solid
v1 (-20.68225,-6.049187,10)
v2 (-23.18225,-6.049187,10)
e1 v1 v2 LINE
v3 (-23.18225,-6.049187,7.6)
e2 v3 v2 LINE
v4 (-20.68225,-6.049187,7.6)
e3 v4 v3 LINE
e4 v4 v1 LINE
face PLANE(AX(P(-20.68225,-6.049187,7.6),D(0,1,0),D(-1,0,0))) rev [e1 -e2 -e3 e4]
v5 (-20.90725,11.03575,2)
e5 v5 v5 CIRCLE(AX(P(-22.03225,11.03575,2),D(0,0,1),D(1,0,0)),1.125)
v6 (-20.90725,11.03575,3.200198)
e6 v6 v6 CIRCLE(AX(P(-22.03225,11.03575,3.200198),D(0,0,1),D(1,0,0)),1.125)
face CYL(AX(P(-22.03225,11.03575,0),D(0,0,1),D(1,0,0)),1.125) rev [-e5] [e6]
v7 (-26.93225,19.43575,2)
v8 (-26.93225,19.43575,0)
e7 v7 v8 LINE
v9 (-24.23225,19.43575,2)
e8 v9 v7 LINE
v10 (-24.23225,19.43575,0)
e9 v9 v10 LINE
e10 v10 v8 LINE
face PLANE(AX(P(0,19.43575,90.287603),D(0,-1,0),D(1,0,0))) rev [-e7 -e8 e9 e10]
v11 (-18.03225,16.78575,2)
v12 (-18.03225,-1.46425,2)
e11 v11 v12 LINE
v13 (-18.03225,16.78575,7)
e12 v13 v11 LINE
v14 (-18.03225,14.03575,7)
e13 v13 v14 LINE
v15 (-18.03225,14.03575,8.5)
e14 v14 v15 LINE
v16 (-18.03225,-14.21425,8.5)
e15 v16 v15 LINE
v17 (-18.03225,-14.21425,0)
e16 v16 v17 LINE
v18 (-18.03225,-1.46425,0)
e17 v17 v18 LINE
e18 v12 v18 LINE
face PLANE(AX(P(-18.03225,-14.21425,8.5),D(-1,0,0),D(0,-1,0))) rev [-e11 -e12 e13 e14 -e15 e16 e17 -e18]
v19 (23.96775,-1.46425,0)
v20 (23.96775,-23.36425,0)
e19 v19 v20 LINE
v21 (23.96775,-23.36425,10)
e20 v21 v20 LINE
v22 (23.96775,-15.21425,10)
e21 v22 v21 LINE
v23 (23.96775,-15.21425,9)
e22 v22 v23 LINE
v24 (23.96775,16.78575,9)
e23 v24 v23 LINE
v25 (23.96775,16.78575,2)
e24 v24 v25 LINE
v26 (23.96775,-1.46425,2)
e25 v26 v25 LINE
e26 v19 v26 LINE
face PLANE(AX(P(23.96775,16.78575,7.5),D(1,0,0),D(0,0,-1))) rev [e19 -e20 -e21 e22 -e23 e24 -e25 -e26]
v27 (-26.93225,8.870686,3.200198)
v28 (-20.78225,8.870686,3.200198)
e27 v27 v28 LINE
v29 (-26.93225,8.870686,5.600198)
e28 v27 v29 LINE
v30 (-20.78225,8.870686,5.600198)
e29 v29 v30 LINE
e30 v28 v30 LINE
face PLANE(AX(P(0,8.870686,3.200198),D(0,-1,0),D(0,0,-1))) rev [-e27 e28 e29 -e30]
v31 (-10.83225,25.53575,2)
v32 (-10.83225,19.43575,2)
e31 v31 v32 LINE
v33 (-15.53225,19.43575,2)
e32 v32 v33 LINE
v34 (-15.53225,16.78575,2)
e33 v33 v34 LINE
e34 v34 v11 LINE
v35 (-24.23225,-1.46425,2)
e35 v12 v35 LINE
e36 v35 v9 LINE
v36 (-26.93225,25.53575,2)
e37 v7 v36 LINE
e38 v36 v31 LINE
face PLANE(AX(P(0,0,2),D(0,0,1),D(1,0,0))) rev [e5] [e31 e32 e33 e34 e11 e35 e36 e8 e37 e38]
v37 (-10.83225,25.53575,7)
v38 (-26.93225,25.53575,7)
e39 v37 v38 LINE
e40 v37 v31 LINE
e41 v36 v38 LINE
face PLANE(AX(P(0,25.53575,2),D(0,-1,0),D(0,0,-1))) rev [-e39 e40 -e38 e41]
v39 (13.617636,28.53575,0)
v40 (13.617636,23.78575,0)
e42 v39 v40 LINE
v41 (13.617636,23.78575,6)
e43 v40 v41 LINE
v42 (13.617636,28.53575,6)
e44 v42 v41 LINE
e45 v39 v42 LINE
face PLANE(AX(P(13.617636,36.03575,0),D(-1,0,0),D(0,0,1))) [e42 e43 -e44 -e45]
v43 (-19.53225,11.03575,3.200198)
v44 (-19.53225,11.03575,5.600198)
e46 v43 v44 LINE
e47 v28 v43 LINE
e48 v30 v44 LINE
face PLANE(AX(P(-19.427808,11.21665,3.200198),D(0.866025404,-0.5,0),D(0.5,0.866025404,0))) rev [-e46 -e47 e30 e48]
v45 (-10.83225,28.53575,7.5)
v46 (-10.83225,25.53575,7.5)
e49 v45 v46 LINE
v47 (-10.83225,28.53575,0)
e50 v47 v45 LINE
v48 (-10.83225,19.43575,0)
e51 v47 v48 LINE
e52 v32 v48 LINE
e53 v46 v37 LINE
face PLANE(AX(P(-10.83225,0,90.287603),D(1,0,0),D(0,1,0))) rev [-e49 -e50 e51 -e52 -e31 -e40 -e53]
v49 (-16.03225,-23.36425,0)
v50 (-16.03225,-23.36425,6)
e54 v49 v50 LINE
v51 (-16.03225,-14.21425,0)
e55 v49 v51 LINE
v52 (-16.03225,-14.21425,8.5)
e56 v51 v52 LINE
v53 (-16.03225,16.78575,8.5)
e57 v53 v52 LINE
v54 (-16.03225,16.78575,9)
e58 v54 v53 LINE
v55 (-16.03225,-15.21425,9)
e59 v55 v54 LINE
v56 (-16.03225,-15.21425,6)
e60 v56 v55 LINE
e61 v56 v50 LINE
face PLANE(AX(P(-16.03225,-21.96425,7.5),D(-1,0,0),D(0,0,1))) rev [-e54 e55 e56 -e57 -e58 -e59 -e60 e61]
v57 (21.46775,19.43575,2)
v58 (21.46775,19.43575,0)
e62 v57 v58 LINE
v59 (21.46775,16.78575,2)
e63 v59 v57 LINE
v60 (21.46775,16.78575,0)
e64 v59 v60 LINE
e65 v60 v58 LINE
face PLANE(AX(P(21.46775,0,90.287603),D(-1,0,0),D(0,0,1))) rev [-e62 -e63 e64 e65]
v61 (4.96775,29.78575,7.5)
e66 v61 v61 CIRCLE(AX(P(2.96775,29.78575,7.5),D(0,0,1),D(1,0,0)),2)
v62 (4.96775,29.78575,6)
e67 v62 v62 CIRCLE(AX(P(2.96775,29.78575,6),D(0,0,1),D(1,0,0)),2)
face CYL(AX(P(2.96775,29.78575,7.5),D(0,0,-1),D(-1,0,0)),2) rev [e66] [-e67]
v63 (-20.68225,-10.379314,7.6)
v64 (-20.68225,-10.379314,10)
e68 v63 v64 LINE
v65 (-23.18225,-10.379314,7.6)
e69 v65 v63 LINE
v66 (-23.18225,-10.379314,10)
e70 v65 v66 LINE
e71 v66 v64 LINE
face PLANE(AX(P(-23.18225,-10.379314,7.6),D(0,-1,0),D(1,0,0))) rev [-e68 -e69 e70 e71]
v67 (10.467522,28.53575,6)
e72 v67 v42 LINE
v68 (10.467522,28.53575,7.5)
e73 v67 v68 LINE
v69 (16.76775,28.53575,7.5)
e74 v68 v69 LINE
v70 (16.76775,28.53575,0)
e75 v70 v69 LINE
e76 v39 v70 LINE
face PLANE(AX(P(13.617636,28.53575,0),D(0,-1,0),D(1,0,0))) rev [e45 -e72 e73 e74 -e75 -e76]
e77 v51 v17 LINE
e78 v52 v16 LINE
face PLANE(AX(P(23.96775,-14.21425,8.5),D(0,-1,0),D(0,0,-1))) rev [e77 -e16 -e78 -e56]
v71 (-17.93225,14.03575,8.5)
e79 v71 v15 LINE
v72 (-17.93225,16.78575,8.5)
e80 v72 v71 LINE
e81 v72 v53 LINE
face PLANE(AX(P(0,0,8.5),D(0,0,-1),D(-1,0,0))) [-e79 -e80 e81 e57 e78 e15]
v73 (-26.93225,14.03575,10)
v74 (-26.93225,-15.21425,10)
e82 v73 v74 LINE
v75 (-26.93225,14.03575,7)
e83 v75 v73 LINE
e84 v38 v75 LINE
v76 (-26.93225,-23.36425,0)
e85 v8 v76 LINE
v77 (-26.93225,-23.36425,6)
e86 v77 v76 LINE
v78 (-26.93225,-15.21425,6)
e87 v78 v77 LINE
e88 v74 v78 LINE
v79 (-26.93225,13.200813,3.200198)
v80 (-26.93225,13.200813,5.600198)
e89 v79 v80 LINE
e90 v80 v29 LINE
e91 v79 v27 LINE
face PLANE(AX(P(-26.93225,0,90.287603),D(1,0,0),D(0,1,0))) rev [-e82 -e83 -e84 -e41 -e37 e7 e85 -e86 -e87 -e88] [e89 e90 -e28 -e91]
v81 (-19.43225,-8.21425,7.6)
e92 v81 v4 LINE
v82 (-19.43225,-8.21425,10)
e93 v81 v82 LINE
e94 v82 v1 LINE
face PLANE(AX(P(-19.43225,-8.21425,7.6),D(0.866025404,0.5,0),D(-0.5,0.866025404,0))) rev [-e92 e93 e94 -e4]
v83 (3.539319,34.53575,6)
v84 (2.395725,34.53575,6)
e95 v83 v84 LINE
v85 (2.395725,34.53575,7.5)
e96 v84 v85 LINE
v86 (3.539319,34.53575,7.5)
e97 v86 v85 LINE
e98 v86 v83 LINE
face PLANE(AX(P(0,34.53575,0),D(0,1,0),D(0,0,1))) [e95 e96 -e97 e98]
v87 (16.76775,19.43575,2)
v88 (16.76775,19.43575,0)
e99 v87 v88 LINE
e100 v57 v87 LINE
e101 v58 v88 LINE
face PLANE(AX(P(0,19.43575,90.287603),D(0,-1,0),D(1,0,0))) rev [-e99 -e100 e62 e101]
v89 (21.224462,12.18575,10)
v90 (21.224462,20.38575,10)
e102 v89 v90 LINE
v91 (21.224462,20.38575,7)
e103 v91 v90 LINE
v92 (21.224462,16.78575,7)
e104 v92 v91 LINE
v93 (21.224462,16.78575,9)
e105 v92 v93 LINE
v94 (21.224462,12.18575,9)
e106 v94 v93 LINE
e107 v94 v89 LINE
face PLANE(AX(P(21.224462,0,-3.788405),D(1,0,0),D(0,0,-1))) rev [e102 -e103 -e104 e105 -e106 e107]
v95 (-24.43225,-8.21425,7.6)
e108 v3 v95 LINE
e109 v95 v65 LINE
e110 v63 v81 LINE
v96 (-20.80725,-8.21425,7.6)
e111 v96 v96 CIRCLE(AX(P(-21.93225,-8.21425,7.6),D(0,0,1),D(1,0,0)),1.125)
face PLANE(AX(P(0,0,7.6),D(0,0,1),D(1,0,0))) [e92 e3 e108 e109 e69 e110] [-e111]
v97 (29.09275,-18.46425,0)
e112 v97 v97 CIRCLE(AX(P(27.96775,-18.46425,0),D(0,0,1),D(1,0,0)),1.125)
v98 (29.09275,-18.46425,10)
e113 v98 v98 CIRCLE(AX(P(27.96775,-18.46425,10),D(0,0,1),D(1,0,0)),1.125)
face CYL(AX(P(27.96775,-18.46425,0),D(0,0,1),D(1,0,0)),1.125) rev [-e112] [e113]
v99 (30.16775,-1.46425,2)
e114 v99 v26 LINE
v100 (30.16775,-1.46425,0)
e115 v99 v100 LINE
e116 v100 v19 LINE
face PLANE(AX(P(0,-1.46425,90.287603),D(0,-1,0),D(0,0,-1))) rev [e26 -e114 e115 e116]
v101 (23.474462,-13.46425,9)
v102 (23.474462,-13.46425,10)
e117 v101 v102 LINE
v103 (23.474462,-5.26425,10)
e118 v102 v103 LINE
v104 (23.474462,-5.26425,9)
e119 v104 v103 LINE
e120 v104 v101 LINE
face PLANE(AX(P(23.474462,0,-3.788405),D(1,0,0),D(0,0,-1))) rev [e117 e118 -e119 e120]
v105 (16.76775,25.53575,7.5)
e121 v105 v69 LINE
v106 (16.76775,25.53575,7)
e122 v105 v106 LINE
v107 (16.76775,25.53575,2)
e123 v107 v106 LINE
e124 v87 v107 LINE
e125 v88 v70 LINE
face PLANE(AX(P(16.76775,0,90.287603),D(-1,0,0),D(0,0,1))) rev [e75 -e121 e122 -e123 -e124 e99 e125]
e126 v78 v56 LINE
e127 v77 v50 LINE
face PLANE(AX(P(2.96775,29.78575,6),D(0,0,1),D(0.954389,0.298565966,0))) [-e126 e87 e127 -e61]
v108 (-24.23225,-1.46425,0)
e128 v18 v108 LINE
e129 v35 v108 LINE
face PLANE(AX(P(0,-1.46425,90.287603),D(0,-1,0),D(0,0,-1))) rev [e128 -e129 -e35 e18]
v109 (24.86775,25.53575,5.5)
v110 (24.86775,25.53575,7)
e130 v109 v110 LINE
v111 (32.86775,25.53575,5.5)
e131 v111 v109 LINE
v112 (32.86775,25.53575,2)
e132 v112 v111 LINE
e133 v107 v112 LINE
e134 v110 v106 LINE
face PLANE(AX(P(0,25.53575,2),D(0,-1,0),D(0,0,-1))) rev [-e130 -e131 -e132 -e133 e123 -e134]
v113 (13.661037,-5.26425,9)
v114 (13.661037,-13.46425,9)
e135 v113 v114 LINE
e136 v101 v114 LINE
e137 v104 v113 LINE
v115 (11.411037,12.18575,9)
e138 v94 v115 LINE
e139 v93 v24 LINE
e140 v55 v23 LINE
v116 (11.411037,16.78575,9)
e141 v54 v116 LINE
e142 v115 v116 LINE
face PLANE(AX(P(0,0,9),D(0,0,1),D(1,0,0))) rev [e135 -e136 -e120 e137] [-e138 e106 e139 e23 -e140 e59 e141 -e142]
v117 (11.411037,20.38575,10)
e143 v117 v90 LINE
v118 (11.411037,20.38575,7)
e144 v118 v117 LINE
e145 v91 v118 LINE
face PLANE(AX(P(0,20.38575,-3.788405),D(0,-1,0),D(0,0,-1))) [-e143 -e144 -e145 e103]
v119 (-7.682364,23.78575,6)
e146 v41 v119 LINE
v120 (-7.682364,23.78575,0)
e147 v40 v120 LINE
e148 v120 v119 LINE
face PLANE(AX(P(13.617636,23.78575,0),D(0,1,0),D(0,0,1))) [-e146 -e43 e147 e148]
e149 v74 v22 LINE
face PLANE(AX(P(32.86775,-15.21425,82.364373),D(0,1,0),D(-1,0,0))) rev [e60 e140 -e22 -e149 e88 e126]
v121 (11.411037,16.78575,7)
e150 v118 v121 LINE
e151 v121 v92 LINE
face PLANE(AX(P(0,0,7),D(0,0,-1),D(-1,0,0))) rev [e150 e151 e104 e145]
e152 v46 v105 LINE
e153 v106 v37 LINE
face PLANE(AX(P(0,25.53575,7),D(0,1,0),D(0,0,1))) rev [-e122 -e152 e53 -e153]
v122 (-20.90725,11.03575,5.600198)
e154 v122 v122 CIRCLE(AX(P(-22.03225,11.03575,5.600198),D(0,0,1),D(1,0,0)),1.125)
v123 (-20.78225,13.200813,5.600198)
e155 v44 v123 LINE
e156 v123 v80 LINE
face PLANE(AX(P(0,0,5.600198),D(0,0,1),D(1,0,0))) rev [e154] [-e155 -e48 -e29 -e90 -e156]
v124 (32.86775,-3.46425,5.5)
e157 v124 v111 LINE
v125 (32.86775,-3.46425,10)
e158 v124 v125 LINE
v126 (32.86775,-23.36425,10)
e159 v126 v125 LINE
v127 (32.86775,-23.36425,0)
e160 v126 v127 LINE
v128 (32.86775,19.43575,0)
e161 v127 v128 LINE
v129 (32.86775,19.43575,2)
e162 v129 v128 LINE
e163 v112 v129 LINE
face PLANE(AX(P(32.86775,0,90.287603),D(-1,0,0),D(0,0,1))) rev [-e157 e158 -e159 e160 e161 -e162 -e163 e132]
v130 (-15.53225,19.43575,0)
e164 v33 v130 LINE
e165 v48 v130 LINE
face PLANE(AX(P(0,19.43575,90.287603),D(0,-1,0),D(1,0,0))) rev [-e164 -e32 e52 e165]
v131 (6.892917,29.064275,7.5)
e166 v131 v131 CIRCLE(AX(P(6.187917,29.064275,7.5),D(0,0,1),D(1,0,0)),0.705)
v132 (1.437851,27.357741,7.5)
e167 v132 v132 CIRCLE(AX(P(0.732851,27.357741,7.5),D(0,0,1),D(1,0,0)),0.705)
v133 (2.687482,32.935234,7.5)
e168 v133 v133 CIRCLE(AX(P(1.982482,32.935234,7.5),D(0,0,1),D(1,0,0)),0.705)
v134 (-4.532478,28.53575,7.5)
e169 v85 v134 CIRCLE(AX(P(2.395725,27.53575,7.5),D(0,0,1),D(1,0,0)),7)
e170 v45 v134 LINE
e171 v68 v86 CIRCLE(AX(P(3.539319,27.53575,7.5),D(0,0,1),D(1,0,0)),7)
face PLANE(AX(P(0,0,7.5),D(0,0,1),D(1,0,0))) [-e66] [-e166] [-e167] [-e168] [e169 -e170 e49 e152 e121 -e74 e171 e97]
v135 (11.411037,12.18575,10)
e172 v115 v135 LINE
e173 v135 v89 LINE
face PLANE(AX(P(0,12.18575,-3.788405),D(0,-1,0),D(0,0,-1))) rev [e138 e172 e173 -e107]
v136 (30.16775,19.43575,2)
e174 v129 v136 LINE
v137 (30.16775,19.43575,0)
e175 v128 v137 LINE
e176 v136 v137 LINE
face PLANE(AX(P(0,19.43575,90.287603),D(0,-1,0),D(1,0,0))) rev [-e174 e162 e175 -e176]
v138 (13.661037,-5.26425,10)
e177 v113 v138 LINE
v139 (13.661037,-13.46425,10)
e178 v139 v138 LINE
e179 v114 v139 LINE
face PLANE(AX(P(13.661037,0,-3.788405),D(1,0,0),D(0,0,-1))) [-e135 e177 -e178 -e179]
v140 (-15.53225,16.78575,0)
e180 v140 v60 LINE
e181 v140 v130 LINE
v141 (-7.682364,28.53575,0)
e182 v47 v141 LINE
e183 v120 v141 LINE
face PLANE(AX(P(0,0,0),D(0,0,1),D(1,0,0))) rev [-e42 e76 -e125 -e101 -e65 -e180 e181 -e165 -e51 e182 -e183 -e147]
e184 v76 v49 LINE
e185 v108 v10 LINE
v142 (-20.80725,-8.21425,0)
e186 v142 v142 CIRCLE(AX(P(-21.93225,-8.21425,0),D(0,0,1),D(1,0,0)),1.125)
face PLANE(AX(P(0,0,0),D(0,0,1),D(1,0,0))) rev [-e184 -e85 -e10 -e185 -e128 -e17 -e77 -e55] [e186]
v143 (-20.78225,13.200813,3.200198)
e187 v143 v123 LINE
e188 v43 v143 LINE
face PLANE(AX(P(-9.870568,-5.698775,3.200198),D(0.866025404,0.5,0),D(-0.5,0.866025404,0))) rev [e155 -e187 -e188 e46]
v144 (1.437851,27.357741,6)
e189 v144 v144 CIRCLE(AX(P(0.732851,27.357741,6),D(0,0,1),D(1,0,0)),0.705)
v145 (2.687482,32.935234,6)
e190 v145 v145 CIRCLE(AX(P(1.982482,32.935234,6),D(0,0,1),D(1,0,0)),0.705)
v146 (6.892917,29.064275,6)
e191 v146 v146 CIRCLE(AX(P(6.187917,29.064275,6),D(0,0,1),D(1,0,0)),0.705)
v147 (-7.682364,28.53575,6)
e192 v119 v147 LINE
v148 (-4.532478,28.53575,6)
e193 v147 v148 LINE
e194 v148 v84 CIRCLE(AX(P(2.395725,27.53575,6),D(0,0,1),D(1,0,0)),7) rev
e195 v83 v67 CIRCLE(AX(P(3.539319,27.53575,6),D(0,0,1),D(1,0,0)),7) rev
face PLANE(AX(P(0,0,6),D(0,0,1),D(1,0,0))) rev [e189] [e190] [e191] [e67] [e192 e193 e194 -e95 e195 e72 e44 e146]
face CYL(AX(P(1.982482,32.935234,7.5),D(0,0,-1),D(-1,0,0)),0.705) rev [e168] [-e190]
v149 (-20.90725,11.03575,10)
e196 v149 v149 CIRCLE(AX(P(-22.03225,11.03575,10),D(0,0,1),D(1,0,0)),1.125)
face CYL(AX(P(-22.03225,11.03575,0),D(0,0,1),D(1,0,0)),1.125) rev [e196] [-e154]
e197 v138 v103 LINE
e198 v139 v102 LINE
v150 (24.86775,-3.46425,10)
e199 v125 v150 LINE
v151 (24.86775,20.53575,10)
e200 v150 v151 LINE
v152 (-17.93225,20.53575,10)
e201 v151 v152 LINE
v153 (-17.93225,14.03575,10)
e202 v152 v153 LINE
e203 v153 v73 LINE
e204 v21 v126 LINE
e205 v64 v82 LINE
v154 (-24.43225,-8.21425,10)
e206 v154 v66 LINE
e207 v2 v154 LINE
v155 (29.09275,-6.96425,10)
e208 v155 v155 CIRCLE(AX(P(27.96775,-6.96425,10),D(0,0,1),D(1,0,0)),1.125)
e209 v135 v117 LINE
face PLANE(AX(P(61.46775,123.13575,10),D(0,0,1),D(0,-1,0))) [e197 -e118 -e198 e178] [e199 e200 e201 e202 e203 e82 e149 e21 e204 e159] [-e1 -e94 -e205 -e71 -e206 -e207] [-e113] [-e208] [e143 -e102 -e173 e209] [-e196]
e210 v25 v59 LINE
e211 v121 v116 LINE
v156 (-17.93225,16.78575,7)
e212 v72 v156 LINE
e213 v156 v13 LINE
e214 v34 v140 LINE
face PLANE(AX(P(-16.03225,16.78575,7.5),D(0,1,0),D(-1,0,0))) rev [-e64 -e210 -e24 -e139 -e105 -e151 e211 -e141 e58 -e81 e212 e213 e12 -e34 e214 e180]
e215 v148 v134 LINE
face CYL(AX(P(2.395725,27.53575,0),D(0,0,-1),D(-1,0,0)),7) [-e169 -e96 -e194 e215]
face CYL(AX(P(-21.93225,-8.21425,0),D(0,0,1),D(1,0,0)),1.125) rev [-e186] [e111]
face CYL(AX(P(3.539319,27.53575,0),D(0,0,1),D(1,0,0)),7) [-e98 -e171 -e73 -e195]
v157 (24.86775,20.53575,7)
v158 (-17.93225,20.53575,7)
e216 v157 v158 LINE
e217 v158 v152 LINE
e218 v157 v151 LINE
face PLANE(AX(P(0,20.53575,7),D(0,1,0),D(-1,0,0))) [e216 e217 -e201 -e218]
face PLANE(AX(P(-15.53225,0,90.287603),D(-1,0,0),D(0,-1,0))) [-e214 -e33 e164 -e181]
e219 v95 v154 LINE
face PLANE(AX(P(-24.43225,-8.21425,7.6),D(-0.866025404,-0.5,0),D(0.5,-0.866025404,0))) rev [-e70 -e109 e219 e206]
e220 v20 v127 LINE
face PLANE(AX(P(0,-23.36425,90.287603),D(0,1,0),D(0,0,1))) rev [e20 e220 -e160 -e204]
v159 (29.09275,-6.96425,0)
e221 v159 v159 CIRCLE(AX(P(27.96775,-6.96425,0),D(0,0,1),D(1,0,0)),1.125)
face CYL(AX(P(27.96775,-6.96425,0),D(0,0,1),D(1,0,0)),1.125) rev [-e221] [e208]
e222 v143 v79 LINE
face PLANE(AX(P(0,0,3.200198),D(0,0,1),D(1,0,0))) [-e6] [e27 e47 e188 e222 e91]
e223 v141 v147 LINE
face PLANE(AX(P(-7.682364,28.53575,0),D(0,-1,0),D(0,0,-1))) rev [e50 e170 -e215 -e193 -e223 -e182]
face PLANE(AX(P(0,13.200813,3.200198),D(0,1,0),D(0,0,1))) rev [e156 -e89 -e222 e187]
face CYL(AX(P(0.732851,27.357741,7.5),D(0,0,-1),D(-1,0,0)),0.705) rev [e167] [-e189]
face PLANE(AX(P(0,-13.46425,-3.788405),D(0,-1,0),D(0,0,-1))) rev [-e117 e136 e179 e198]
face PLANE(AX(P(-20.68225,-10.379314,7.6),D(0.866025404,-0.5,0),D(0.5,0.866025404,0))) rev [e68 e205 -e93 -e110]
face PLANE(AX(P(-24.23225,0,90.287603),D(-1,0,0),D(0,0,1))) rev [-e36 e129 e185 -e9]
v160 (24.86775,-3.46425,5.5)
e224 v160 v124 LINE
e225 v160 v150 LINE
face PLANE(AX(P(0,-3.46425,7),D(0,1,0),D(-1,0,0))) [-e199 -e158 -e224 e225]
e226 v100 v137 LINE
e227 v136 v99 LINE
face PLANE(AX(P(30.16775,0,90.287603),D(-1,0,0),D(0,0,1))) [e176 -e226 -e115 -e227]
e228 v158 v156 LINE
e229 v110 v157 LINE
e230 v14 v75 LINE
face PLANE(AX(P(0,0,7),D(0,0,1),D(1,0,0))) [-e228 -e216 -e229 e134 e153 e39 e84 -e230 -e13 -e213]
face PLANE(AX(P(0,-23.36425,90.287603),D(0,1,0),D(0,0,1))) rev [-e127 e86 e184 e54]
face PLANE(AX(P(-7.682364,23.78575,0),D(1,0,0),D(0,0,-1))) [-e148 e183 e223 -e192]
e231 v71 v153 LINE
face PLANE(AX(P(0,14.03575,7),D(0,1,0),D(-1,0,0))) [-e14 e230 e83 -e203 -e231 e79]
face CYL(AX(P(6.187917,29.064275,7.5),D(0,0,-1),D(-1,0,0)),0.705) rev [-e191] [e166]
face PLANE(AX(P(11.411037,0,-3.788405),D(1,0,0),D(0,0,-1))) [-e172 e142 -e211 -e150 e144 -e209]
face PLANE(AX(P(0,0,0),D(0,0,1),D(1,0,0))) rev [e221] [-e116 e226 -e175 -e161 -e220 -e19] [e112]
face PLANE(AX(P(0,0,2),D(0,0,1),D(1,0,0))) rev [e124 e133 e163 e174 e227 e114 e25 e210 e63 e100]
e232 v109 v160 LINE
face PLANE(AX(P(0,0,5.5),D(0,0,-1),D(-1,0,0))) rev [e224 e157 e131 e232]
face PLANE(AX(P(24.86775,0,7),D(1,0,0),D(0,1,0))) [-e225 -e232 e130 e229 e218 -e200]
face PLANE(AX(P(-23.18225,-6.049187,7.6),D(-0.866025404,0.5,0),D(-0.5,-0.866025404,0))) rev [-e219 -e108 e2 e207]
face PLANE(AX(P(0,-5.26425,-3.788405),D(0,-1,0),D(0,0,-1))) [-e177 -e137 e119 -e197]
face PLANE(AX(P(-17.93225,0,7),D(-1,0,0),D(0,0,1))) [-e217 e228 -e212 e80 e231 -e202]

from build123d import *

# Parameters (mm, degrees)
SKETCH1_R           = 6
BOSS_EXTRUDE1_DEPTH = 6
SKETCH2_W           = 27.6
SKETCH2_H           = 16.6
SKETCH2_R           = 6
SKETCH2_R_2         = 0.705
SKETCH2_R_3         = 2
BOSS_EXTRUDE2_DEPTH = 1.5
BOSS_EXTRUDE3_START = -4
BOSS_EXTRUDE3_DEPTH = 4
SKETCH5_W           = 40
SKETCH5_H           = 38.75
CUT_EXTRUDE1_DEPTH  = 50.346876803
SKETCH6_W           = 59.8
SKETCH6_H           = 40.75
BOSS_EXTRUDE4_DEPTH = 4
SKETCH7_W           = 40
SKETCH7_H           = 38.75
CUT_EXTRUDE2_DEPTH  = 3
SKETCH8_W           = 10.5
SKETCH8_H           = 8.15
CUT_EXTRUDE3_DEPTH  = 3
SKETCH8_3_W         = 9.813424901
SKETCH8_3_H         = 8.2
CUT_EXTRUDE4_DEPTH  = 1
CUT_EXTRUDE5_DEPTH  = 2
SKETCH10_W          = 8.9
SKETCH10_H          = 8.15
BOSS_EXTRUDE5_DEPTH = 4
SKETCH12_W          = 7.5
SKETCH12_H          = 1.5
CUT_EXTRUDE7_DEPTH  = 50.346876803
CUT_EXTRUDE8_DEPTH  = 2.4
CUT_EXTRUDE9_DEPTH  = 2.4
SKETCH16_R          = 1.125
CUT_EXTRUDE10_DEPTH = 50.788193884
SKETCH17_W          = 42
SKETCH17_H          = 31
CUT_EXTRUDE11_DEPTH = 8.5
SKETCH19_W          = 21.3
SKETCH19_H          = 12.25
CUT_EXTRUDE12_DEPTH = 50.141268301
SKETCH20_W          = 3.149886021
SKETCH20_H          = 7.5
SKETCH20_W_2        = 3.150113979
CUT_EXTRUDE13_DEPTH = 50.346876803
FILLET1_R           = 7
SKETCH21_W          = 5
SKETCH21_H          = 1.4
CUT_EXTRUDE14_DEPTH = 50.141268301
SKETCH22_W          = 9.813424901
SKETCH22_H          = 3.6
CUT_EXTRUDE15_DEPTH = 2
SKETCH23_W          = 3.149886021
SKETCH23_H          = 7.5
SKETCH23_W_2        = 3.150113979
CUT_EXTRUDE16_DEPTH = 50.346876803
SKETCH24_W          = 35
SKETCH24_H          = 1.4
CUT_EXTRUDE17_DEPTH = 49.713519689


# Read off the part's stored shape, not the designer's step: Boss-Extrude3
with BuildPart() as part:
    # Sketch1 → Boss-Extrude1 (new body)
    with BuildSketch(Plane.XY):
        Polygon((-10.832250172, 36.035749909), (-10.832250172, 19.435749909), (-15.532250172, 19.435749909), (-15.532250172, -1.464250091), (-24.232250172, -1.464250091), (-24.232250172, 19.435749909), (-26.932250172, 19.435749909), (-26.932250172, -23.364250091), (32.867749828, -23.364250091), (32.867749828, 19.435749909), (30.167749828, 19.435749909), (30.167749828, -1.464250091), (21.467749828, -1.464250091), (21.467749828, 19.435749909), (16.767749828, 19.435749909), (16.767749828, 36.035749909), align=None)
        with Locations((2.967749828, 29.785749909)):
            Circle(SKETCH1_R, mode=Mode.SUBTRACT)
    extrude(amount=BOSS_EXTRUDE1_DEPTH)

    # Sketch2 → Boss-Extrude2 (add)
    # profile 1 of 2: a face of its own
    with BuildSketch(Plane.XY.offset(6)):
        with Locations((2.967749828, 27.735749909)):
            Rectangle(SKETCH2_W, SKETCH2_H)
        with Locations((2.967749828, 29.785749909)):
            Circle(SKETCH2_R, mode=Mode.SUBTRACT)
    # profile 2 of 2: a face of its own
    with BuildSketch(Plane.XY.offset(6)):
        with Locations((2.967749828, 29.785749909)):
            Circle(SKETCH2_R)
        with Locations((0.732850657, 27.357741339)):
            Circle(SKETCH2_R_2, mode=Mode.SUBTRACT)
        with Locations((6.187916827, 29.064275155)):
            Circle(SKETCH2_R_2, mode=Mode.SUBTRACT)
        with Locations((1.982482071, 32.935233827)):
            Circle(SKETCH2_R_2, mode=Mode.SUBTRACT)
        with Locations((2.967749828, 29.785749909)):
            Circle(SKETCH2_R_3, mode=Mode.SUBTRACT)
    extrude(amount=BOSS_EXTRUDE2_DEPTH)

    # Boss-Extrude3 outline → Boss-Extrude3 (add)
    with BuildSketch(Plane.XY.offset(6).offset(BOSS_EXTRUDE3_START)):
        Polygon((32.867749828, 19.435749909), (32.867749828, 25.535749909), (16.767749828, 25.535749909), (16.767749828, 19.435749909), (21.467749828, 19.435749909), (21.467749828, -1.464250091), (30.167749828, -1.464250091), (30.167749828, 19.435749909), align=None)
        Polygon((-26.932250172, 25.535749909), (-26.932250172, 19.435749909), (-24.232250172, 19.435749909), (-24.232250172, -1.464250091), (-15.532250172, -1.464250091), (-15.532250172, 19.435749909), (-10.832250172, 19.435749909), (-10.832250172, 25.535749909), align=None)
    extrude(amount=BOSS_EXTRUDE3_DEPTH)

    # Sketch5 → Cut-Extrude1 (cut, through all)
    with BuildSketch(Plane(origin=(0, 0, 0), x_dir=(-1, 0, 0), z_dir=(0, 0, -1))):
        with Locations((-3.967749828, -2.589250091)):
            Rectangle(SKETCH5_W, SKETCH5_H)
    extrude(amount=-CUT_EXTRUDE1_DEPTH, mode=Mode.SUBTRACT)

    # Sketch6 → Boss-Extrude4 (add)
    with BuildSketch(Plane.XY.offset(6)):
        with Locations((2.967749828, 5.160749909)):
            Rectangle(SKETCH6_W, SKETCH6_H)
    extrude(amount=BOSS_EXTRUDE4_DEPTH)

    # Sketch7 → Cut-Extrude2 (cut)
    with BuildSketch(Plane(origin=(0, 0, 6), x_dir=(-1, 0, 0), z_dir=(0, 0, -1))):
        with Locations((-3.967749828, -2.589250091)):
            Rectangle(SKETCH7_W, SKETCH7_H)
    extrude(amount=-CUT_EXTRUDE2_DEPTH, mode=Mode.SUBTRACT)

    # Sketch8 → Cut-Extrude3 (cut)
    with BuildSketch(Plane.XY.offset(10)):
        Polygon((24.867749828, -3.464250091), (32.867749828, -3.464250091), (32.867749828, 25.535749909), (-26.932250172, 25.535749909), (-26.932250172, 14.035749909), (-17.932250172, 14.035749909), (-17.932250172, 20.535749909), (24.867749828, 20.535749909), align=None)
        with Locations((-21.682250172, -19.289250091)):
            Rectangle(SKETCH8_W, SKETCH8_H)
    extrude(amount=-CUT_EXTRUDE3_DEPTH, mode=Mode.SUBTRACT)

    # Sketch8<3> → Cut-Extrude4 (cut)
    with BuildSketch(Plane.XY.offset(10)):
        with Locations((16.317749828, 16.285749909)):
            Rectangle(SKETCH8_3_W, SKETCH8_3_H)
        with Locations((18.567749828, -9.364250091)):
            Rectangle(SKETCH8_3_W, SKETCH8_3_H)
    extrude(amount=-CUT_EXTRUDE4_DEPTH, mode=Mode.SUBTRACT)

    # Sketch9 → Cut-Extrude5 (cut)
    with BuildSketch(Plane.XY.offset(7.5)):
        Polygon((24.867749828, 20.535749909), (24.867749828, -3.464250091), (32.867749828, -3.464250091), (32.867749828, 25.535749909), (24.867749828, 25.535749909), align=None)
    extrude(amount=-CUT_EXTRUDE5_DEPTH, mode=Mode.SUBTRACT)

    # Sketch10 → Boss-Extrude5 (add)
    with BuildSketch(Plane.XY.offset(6)):
        with Locations((28.417749828, -19.289250091)):
            Rectangle(SKETCH10_W, SKETCH10_H)
    extrude(amount=BOSS_EXTRUDE5_DEPTH)

    # Sketch12 → Cut-Extrude7 (cut, through all)
    with BuildSketch(Plane.XY.offset(7.5)):
        with Locations((-0.78247813, 35.285749909)):
            Rectangle(SKETCH12_W, SKETCH12_H)
        with Locations((6.71752187, 35.285749909)):
            Rectangle(SKETCH12_W, SKETCH12_H)
    extrude(amount=-CUT_EXTRUDE7_DEPTH, mode=Mode.SUBTRACT)

    # Sketch13 → Cut-Extrude8 (cut)
    with BuildSketch(Plane.XY.offset(10)):
        Polygon((-19.432250172, -8.214250091), (-20.682250172, -6.049186582), (-23.182250172, -6.049186582), (-24.432250172, -8.214250091), (-23.182250172, -10.379313601), (-20.682250172, -10.379313601), align=None)
    extrude(amount=-CUT_EXTRUDE8_DEPTH, mode=Mode.SUBTRACT)

    # Sketch15 → Cut-Extrude9 (cut)
    with BuildSketch(Plane(origin=(-203.37180159, 125.682543488, 5.600198), x_dir=(1, 0, 0), z_dir=(0, 0, 1))):
        Polygon((180.089551417, -116.811857089), (182.589551417, -116.811857089), (183.839551417, -114.646793579), (182.589551417, -112.48173007), (180.089551417, -112.48173007), (178.839551417, -114.646793579), align=None)
        Polygon((176.439551417, -112.48173007), (176.439551417, -116.811857089), (180.089551417, -116.811857089), (178.839551417, -114.646793579), (180.089551417, -112.48173007), align=None)
    extrude(amount=-CUT_EXTRUDE9_DEPTH, mode=Mode.SUBTRACT)

    # Sketch16 → Cut-Extrude10 (cut, through all)
    with BuildSketch(Plane.XY.offset(10)):
        with Locations((-21.932250172, -8.214250091)):
            Circle(SKETCH16_R)
        with Locations((-22.032250172, 11.035749909)):
            Circle(SKETCH16_R)
        with Locations((27.967749828, -6.964250091)):
            Circle(SKETCH16_R)
        with Locations((27.967749828, -18.464250091)):
            Circle(SKETCH16_R)
    extrude(amount=-CUT_EXTRUDE10_DEPTH, mode=Mode.SUBTRACT)

    # Sketch17 → Cut-Extrude11 (cut)
    with BuildSketch(Plane(origin=(0, 0, 0), x_dir=(-1, 0, 0), z_dir=(0, 0, -1))):
        with Locations((-2.967749828, 1.285749909)):
            Rectangle(SKETCH17_W, SKETCH17_H)
    extrude(amount=-CUT_EXTRUDE11_DEPTH, mode=Mode.SUBTRACT)

    # Sketch19 → Cut-Extrude12 (cut, through all)
    with BuildSketch(Plane(origin=(0, 0, 6), x_dir=(-1, 0, 0), z_dir=(0, 0, -1))):
        with Locations((-2.967635849, 29.910749909)):
            Rectangle(SKETCH19_W, SKETCH19_H)
    extrude(amount=CUT_EXTRUDE12_DEPTH, mode=Mode.SUBTRACT)

    # Sketch20 → Cut-Extrude13 (cut, through all)
    with BuildSketch(Plane.XY.offset(7.5)):
        with Locations((-6.107421141, 32.285749909)):
            Rectangle(SKETCH20_W, SKETCH20_H)
        with Locations((12.04257886, 32.285749909)):
            Rectangle(SKETCH20_W_2, SKETCH20_H)
    extrude(amount=-CUT_EXTRUDE13_DEPTH, mode=Mode.SUBTRACT)

    # Fillet1
    # the kernel refuses this fillet: 7 mm, written as the material it takes off along each edge
    with BuildSketch(Plane(origin=(-4.53247813, 34.535749909, 24.820508076), x_dir=(0, -1, 0), z_dir=(0, 0, -1))) as fillet1_piece_1:
        with BuildLine():
            CenterArc((7, -6.92820323), FILLET1_R, 98.213210702, 81.786789298)
            Line((0, -6.92820323), (-0.14, -6.92820323))
            Line((-0.14, -6.92820323), (-0.14, 0))
            Line((-0.14, 0), (0, 0.14))
            ThreePointArc((0, 0.14), (3, 0.14), (5.98, 0.138564065))
            Line((5.98, 0.138564065), (6, 0))
        make_face()
    extrude(amount=36.141016151, mode=Mode.SUBTRACT)
    with BuildSketch(Plane(origin=(10.46752187, 34.535749909, 24.820508076), x_dir=(-1, 0, 0), z_dir=(0, 0, -1))) as fillet1_piece_2:
        with BuildLine():
            CenterArc((6.92820323, -7), FILLET1_R, 90, 81.786789298)
            Line((0, -6), (-0.138564065, -5.98))
            ThreePointArc((-0.138564065, -5.98), (-0.14, -3), (-0.14, 0))
            Line((-0.14, 0), (0, 0.14))
            Line((0, 0.14), (6.92820323, 0.14))
            Line((6.92820323, 0.14), (6.92820323, 0))
        make_face()
    extrude(amount=36.141016151, mode=Mode.SUBTRACT)

    # Sketch21 → Cut-Extrude14 (cut, through all)
    with BuildSketch(Plane.XY.offset(6)):
        with Locations((-13.532250172, -22.664250091)):
            Rectangle(SKETCH21_W, SKETCH21_H)
    extrude(amount=-CUT_EXTRUDE14_DEPTH, mode=Mode.SUBTRACT)

    # Sketch22 → Cut-Extrude15 (cut)
    with BuildSketch(Plane.XY.offset(9)):
        with Locations((16.317749828, 18.585749909)):
            Rectangle(SKETCH22_W, SKETCH22_H)
    extrude(amount=-CUT_EXTRUDE15_DEPTH, mode=Mode.SUBTRACT)

    # Sketch23 → Cut-Extrude16 (cut, through all)
    with BuildSketch(Plane.XY.offset(7.5)):
        with Locations((-9.257307161, 32.285749909)):
            Rectangle(SKETCH23_W, SKETCH23_H)
        with Locations((15.192692839, 32.285749909)):
            Rectangle(SKETCH23_W_2, SKETCH23_H)
    extrude(amount=-CUT_EXTRUDE16_DEPTH, mode=Mode.SUBTRACT)

    # Sketch24 → Cut-Extrude17 (cut, through all)
    with BuildSketch(Plane(origin=(0, 0, 0), x_dir=(-1, 0, 0), z_dir=(0, 0, -1))):
        with Locations((-6.467749828, -22.664250091)):
            Rectangle(SKETCH24_W, SKETCH24_H)
    extrude(amount=-CUT_EXTRUDE17_DEPTH, mode=Mode.SUBTRACT)


solid = part.part
